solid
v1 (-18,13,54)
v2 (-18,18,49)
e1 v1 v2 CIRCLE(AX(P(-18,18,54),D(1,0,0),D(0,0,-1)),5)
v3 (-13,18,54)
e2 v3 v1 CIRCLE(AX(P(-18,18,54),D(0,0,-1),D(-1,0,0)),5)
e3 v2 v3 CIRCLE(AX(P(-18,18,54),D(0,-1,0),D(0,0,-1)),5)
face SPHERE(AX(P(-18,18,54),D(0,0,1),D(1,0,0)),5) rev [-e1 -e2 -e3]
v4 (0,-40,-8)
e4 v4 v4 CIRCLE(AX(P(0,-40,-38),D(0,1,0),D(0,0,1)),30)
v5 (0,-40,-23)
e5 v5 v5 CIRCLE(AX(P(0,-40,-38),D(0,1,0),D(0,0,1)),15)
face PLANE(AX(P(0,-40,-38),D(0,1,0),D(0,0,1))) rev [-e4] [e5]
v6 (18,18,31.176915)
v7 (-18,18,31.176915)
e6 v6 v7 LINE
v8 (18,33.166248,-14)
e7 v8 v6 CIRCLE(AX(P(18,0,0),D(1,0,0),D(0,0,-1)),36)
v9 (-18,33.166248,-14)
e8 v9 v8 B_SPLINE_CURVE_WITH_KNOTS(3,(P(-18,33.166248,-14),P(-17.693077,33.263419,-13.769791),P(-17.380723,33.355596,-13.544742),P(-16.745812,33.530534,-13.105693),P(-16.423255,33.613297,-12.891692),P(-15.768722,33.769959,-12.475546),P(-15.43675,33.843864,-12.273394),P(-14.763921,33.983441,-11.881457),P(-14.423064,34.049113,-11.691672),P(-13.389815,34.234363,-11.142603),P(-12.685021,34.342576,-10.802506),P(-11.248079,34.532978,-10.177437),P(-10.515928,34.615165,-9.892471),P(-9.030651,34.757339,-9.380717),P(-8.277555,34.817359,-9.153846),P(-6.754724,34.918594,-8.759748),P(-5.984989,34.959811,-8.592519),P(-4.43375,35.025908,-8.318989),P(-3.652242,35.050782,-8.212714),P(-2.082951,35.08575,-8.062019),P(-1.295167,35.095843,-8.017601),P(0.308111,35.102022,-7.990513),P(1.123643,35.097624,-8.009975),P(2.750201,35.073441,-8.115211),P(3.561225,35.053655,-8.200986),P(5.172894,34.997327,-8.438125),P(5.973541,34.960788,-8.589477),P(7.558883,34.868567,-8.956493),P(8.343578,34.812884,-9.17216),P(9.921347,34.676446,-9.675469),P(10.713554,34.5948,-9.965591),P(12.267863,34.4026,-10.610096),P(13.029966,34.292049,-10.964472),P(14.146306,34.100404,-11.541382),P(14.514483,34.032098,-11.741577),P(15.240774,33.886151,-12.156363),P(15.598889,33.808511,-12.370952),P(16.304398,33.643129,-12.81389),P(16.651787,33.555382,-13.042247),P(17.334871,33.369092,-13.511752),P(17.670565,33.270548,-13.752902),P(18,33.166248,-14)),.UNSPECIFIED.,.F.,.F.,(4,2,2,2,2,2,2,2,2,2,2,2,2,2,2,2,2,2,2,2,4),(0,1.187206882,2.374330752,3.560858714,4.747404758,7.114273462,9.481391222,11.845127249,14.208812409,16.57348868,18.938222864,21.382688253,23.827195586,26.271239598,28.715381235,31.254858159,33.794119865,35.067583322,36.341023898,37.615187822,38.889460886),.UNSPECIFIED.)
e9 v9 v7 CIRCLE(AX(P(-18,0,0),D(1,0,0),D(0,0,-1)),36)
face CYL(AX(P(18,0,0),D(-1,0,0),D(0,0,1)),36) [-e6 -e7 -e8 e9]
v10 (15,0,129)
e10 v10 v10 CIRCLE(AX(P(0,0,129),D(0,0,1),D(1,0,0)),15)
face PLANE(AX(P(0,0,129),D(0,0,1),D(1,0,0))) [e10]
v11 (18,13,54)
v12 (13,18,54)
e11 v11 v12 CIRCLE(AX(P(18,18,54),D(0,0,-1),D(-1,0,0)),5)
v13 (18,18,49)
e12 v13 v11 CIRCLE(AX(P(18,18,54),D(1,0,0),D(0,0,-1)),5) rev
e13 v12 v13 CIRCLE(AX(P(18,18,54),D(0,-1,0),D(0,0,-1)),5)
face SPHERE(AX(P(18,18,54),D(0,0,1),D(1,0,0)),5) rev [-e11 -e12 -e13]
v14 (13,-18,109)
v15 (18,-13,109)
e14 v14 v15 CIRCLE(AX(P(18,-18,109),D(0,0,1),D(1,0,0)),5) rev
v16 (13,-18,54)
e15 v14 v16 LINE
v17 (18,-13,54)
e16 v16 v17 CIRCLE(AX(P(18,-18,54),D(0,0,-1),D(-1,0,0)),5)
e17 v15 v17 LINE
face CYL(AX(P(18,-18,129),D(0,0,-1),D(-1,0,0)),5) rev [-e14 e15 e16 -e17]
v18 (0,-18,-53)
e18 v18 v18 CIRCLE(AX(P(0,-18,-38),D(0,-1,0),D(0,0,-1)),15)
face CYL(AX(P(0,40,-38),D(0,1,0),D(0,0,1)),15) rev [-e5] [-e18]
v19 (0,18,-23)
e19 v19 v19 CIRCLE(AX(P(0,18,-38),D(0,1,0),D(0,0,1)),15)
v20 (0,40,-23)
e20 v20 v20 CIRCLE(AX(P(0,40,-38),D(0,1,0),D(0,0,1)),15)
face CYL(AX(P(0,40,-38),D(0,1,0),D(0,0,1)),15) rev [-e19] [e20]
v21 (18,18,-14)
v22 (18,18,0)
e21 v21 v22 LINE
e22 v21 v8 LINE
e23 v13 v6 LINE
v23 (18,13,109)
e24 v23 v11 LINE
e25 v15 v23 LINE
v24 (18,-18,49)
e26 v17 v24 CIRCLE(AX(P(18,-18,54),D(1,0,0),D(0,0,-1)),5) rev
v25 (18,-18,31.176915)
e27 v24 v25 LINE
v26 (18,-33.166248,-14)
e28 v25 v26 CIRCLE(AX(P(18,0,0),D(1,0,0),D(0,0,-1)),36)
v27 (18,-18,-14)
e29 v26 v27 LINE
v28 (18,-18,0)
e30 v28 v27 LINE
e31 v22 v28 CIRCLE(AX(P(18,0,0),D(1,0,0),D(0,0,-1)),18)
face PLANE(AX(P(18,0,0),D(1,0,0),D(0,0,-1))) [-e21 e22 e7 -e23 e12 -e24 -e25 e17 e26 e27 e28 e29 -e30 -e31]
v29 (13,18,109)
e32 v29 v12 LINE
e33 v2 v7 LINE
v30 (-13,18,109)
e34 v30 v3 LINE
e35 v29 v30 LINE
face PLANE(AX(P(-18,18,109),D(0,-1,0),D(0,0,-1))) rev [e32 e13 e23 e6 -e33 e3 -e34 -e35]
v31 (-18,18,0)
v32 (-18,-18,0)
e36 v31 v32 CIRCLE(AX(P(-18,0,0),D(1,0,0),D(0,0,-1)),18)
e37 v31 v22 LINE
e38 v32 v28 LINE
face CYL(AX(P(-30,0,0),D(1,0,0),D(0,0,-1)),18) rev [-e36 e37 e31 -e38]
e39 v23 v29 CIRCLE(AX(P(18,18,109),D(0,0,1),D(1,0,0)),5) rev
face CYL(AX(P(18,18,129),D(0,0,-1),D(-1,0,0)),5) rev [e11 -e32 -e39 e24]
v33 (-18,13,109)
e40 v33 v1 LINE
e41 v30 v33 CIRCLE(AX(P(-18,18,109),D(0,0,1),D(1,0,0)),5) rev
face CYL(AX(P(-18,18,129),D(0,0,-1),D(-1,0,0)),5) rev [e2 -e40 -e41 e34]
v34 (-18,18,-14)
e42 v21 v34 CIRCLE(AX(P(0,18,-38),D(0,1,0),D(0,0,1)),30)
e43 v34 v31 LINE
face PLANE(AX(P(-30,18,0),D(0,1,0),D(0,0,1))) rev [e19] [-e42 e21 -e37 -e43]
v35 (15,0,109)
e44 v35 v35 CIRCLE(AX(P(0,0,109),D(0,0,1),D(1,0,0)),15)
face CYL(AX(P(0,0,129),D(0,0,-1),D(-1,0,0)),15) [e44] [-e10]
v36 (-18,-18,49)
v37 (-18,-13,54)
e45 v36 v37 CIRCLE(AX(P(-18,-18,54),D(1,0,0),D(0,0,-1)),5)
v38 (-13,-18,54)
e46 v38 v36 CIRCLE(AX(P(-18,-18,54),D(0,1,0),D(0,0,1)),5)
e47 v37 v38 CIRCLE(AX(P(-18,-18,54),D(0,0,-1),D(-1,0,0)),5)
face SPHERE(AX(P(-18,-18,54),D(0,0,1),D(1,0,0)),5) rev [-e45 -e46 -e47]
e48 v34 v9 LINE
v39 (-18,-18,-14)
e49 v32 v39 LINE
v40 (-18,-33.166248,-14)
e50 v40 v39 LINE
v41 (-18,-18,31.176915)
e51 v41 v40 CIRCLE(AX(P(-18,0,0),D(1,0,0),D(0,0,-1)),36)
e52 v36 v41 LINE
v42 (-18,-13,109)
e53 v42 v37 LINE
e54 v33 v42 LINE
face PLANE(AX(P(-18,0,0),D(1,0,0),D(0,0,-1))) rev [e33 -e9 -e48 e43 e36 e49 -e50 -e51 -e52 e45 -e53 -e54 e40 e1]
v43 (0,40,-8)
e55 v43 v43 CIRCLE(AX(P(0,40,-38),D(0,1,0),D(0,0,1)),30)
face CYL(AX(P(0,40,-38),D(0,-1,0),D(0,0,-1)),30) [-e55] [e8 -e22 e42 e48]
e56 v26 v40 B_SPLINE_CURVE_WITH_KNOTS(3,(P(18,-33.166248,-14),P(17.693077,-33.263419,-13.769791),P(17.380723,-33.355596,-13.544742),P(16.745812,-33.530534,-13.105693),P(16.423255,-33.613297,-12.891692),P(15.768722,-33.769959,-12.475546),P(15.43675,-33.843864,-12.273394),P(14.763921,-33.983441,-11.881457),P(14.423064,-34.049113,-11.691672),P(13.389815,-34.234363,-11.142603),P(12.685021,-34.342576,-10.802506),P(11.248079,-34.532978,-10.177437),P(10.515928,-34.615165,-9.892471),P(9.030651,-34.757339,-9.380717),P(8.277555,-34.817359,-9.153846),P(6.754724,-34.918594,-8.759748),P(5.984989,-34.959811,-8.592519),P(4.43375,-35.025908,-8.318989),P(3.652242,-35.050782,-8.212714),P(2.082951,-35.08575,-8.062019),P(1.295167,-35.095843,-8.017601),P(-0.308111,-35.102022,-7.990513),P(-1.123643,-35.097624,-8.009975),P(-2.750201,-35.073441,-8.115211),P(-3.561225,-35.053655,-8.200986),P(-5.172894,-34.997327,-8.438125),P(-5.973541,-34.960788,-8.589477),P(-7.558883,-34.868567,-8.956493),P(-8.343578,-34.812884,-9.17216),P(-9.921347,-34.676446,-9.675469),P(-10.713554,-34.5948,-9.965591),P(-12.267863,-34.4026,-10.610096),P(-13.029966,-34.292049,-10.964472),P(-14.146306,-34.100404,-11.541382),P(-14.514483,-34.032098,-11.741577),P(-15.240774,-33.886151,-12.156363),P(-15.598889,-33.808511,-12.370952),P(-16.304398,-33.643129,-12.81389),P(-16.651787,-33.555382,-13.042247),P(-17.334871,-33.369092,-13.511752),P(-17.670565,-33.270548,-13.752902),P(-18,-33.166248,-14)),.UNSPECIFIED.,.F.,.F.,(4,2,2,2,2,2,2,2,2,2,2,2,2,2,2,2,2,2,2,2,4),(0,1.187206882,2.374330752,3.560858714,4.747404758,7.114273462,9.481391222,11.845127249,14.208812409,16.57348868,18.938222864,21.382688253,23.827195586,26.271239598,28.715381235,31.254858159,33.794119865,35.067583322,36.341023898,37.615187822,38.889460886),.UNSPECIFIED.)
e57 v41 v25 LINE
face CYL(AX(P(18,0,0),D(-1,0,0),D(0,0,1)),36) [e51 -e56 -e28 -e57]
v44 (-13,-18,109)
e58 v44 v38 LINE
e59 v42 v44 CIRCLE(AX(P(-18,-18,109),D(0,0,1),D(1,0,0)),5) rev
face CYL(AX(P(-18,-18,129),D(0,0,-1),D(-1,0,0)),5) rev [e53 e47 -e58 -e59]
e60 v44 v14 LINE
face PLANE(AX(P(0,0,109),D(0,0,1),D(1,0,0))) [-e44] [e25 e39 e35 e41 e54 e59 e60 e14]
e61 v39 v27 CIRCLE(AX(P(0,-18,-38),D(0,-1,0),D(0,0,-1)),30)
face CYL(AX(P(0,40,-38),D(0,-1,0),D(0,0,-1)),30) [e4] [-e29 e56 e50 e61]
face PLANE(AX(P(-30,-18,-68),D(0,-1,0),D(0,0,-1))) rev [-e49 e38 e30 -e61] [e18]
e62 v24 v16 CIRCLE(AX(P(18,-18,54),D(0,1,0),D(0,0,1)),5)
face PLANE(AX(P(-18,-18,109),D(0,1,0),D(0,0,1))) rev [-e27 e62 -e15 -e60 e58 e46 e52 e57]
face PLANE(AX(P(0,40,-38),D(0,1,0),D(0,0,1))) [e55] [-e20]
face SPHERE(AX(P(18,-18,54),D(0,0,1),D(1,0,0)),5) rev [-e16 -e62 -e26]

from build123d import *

# Parameters (mm, degrees)
SKETCH1_R                = 36
BOSS_EXTRUDE1_DEPTH      = 18
SKETCH2_W                = 36
SKETCH2_H                = 36
BOSS_EXTRUDE2_DEPTH      = 109
SKETCH3_R                = 15
BOSS_EXTRUDE3_DEPTH      = 20
SKETCH4_R                = 30
BOSS_EXTRUDE4_DEPTH      = 40
CUT_EXTRUDE1_DEPTH       = 139.351002938
CUT_EXTRUDE1_DEPTH_BACK  = 139.351002938
HOLE1_D                  = 30
CUT_EXTRUDE2_START       = -60
CUT_EXTRUDE2_DEPTH       = 244.926615935
FILLET1_R                = 5
CIRPATTERN1_COUNT        = 4
FILLET1_OF_CIRPATTERN1_R = 5


with BuildPart() as part:
    # Sketch1 → Boss-Extrude1 (new, symmetric)
    with BuildSketch(Plane(origin=(0, 0, 0), x_dir=(0, 0, -1), z_dir=(1, 0, 0))):
        Circle(SKETCH1_R)
    extrude(amount=BOSS_EXTRUDE1_DEPTH, both=True)

    # Sketch2 → Boss-Extrude2 (add)
    with BuildSketch(Plane.XY):
        Rectangle(SKETCH2_W, SKETCH2_H)
    extrude(amount=BOSS_EXTRUDE2_DEPTH)

    # Sketch3 → Boss-Extrude3 (add)
    with BuildSketch(Plane.XY.offset(109)):
        Circle(SKETCH3_R)
    extrude(amount=BOSS_EXTRUDE3_DEPTH)

    # Sketch4 → Boss-Extrude4 (add, symmetric)
    with BuildSketch(Plane(origin=(0, 0, 0), x_dir=(1, 0, 0), z_dir=(0, 1, 0))):
        with Locations(Location((0, 38, 0), (0, 0, 270))):
            Circle(SKETCH4_R)
    extrude(amount=BOSS_EXTRUDE4_DEPTH, both=True)

    # Sketch5 → Cut-Extrude1 (cut, two sides: drawn at the far end of the back side and taken through both)
    with BuildSketch(Plane(origin=(0, 0, 0), x_dir=(0, 0, -1), z_dir=(1, 0, 0)).offset(-CUT_EXTRUDE1_DEPTH_BACK)):
        with BuildLine():
            Line((0, 18), (68, 18))
            Line((68, 18), (68, -18))
            Line((68, -18), (0, -18))
            ThreePointArc((0, -18), (-18, 0), (0, 18))
        make_face()
    extrude(amount=CUT_EXTRUDE1_DEPTH + CUT_EXTRUDE1_DEPTH_BACK, mode=Mode.SUBTRACT)

    # Hole1 (through all)
    with Locations(Plane(origin=(0, 40, 0), x_dir=(1, 0, 0), z_dir=(0, 1, 0))):
        with Locations((0, 38)):
            Hole(HOLE1_D / 2)

    # Sketch8 → Cut-Extrude2 (cut)
    with BuildSketch(Plane.XY.offset(109).offset(CUT_EXTRUDE2_START)):
        with BuildLine():
            Line((13, 18), (18, 18))
            Line((18, 18), (18, 13))
            ThreePointArc((18, 13), (14.464466094, 14.464466094), (13, 18))
        make_face()
    cut_extrude2 = extrude(amount=CUT_EXTRUDE2_DEPTH, mode=Mode.SUBTRACT)

    # Fillet1
    fillet1_edges = [part.edges().sort_by_distance(p)[0] for p in [
        (14.464466094, 14.464466094, 49),
    ]]
    fillet(fillet1_edges, radius=FILLET1_R - 0.0001)  # a hair under: the kernel refuses the full size

    # CirPattern1: Cut-Extrude2 ×4 about axis
    cirpattern1_axis = Axis((0, 0, 0), (0, 0, 1))
    for i in range(1, CIRPATTERN1_COUNT):
        add(cut_extrude2.rotate(cirpattern1_axis, i * 360 / CIRPATTERN1_COUNT), mode=Mode.SUBTRACT)

    # Fillet1 of CirPattern1
    fillet1_of_cirpattern1_edges = [part.edges().sort_by_distance(p)[0] for p in [
        (-14.464466094, 14.464466094, 49),
        (-14.464466094, -14.464466094, 49),
        (14.464466094, -14.464466094, 49),
    ]]
    fillet(fillet1_of_cirpattern1_edges, radius=FILLET1_OF_CIRPATTERN1_R - 0.0001)  # a hair under: the kernel refuses the full size


solid = part.part
